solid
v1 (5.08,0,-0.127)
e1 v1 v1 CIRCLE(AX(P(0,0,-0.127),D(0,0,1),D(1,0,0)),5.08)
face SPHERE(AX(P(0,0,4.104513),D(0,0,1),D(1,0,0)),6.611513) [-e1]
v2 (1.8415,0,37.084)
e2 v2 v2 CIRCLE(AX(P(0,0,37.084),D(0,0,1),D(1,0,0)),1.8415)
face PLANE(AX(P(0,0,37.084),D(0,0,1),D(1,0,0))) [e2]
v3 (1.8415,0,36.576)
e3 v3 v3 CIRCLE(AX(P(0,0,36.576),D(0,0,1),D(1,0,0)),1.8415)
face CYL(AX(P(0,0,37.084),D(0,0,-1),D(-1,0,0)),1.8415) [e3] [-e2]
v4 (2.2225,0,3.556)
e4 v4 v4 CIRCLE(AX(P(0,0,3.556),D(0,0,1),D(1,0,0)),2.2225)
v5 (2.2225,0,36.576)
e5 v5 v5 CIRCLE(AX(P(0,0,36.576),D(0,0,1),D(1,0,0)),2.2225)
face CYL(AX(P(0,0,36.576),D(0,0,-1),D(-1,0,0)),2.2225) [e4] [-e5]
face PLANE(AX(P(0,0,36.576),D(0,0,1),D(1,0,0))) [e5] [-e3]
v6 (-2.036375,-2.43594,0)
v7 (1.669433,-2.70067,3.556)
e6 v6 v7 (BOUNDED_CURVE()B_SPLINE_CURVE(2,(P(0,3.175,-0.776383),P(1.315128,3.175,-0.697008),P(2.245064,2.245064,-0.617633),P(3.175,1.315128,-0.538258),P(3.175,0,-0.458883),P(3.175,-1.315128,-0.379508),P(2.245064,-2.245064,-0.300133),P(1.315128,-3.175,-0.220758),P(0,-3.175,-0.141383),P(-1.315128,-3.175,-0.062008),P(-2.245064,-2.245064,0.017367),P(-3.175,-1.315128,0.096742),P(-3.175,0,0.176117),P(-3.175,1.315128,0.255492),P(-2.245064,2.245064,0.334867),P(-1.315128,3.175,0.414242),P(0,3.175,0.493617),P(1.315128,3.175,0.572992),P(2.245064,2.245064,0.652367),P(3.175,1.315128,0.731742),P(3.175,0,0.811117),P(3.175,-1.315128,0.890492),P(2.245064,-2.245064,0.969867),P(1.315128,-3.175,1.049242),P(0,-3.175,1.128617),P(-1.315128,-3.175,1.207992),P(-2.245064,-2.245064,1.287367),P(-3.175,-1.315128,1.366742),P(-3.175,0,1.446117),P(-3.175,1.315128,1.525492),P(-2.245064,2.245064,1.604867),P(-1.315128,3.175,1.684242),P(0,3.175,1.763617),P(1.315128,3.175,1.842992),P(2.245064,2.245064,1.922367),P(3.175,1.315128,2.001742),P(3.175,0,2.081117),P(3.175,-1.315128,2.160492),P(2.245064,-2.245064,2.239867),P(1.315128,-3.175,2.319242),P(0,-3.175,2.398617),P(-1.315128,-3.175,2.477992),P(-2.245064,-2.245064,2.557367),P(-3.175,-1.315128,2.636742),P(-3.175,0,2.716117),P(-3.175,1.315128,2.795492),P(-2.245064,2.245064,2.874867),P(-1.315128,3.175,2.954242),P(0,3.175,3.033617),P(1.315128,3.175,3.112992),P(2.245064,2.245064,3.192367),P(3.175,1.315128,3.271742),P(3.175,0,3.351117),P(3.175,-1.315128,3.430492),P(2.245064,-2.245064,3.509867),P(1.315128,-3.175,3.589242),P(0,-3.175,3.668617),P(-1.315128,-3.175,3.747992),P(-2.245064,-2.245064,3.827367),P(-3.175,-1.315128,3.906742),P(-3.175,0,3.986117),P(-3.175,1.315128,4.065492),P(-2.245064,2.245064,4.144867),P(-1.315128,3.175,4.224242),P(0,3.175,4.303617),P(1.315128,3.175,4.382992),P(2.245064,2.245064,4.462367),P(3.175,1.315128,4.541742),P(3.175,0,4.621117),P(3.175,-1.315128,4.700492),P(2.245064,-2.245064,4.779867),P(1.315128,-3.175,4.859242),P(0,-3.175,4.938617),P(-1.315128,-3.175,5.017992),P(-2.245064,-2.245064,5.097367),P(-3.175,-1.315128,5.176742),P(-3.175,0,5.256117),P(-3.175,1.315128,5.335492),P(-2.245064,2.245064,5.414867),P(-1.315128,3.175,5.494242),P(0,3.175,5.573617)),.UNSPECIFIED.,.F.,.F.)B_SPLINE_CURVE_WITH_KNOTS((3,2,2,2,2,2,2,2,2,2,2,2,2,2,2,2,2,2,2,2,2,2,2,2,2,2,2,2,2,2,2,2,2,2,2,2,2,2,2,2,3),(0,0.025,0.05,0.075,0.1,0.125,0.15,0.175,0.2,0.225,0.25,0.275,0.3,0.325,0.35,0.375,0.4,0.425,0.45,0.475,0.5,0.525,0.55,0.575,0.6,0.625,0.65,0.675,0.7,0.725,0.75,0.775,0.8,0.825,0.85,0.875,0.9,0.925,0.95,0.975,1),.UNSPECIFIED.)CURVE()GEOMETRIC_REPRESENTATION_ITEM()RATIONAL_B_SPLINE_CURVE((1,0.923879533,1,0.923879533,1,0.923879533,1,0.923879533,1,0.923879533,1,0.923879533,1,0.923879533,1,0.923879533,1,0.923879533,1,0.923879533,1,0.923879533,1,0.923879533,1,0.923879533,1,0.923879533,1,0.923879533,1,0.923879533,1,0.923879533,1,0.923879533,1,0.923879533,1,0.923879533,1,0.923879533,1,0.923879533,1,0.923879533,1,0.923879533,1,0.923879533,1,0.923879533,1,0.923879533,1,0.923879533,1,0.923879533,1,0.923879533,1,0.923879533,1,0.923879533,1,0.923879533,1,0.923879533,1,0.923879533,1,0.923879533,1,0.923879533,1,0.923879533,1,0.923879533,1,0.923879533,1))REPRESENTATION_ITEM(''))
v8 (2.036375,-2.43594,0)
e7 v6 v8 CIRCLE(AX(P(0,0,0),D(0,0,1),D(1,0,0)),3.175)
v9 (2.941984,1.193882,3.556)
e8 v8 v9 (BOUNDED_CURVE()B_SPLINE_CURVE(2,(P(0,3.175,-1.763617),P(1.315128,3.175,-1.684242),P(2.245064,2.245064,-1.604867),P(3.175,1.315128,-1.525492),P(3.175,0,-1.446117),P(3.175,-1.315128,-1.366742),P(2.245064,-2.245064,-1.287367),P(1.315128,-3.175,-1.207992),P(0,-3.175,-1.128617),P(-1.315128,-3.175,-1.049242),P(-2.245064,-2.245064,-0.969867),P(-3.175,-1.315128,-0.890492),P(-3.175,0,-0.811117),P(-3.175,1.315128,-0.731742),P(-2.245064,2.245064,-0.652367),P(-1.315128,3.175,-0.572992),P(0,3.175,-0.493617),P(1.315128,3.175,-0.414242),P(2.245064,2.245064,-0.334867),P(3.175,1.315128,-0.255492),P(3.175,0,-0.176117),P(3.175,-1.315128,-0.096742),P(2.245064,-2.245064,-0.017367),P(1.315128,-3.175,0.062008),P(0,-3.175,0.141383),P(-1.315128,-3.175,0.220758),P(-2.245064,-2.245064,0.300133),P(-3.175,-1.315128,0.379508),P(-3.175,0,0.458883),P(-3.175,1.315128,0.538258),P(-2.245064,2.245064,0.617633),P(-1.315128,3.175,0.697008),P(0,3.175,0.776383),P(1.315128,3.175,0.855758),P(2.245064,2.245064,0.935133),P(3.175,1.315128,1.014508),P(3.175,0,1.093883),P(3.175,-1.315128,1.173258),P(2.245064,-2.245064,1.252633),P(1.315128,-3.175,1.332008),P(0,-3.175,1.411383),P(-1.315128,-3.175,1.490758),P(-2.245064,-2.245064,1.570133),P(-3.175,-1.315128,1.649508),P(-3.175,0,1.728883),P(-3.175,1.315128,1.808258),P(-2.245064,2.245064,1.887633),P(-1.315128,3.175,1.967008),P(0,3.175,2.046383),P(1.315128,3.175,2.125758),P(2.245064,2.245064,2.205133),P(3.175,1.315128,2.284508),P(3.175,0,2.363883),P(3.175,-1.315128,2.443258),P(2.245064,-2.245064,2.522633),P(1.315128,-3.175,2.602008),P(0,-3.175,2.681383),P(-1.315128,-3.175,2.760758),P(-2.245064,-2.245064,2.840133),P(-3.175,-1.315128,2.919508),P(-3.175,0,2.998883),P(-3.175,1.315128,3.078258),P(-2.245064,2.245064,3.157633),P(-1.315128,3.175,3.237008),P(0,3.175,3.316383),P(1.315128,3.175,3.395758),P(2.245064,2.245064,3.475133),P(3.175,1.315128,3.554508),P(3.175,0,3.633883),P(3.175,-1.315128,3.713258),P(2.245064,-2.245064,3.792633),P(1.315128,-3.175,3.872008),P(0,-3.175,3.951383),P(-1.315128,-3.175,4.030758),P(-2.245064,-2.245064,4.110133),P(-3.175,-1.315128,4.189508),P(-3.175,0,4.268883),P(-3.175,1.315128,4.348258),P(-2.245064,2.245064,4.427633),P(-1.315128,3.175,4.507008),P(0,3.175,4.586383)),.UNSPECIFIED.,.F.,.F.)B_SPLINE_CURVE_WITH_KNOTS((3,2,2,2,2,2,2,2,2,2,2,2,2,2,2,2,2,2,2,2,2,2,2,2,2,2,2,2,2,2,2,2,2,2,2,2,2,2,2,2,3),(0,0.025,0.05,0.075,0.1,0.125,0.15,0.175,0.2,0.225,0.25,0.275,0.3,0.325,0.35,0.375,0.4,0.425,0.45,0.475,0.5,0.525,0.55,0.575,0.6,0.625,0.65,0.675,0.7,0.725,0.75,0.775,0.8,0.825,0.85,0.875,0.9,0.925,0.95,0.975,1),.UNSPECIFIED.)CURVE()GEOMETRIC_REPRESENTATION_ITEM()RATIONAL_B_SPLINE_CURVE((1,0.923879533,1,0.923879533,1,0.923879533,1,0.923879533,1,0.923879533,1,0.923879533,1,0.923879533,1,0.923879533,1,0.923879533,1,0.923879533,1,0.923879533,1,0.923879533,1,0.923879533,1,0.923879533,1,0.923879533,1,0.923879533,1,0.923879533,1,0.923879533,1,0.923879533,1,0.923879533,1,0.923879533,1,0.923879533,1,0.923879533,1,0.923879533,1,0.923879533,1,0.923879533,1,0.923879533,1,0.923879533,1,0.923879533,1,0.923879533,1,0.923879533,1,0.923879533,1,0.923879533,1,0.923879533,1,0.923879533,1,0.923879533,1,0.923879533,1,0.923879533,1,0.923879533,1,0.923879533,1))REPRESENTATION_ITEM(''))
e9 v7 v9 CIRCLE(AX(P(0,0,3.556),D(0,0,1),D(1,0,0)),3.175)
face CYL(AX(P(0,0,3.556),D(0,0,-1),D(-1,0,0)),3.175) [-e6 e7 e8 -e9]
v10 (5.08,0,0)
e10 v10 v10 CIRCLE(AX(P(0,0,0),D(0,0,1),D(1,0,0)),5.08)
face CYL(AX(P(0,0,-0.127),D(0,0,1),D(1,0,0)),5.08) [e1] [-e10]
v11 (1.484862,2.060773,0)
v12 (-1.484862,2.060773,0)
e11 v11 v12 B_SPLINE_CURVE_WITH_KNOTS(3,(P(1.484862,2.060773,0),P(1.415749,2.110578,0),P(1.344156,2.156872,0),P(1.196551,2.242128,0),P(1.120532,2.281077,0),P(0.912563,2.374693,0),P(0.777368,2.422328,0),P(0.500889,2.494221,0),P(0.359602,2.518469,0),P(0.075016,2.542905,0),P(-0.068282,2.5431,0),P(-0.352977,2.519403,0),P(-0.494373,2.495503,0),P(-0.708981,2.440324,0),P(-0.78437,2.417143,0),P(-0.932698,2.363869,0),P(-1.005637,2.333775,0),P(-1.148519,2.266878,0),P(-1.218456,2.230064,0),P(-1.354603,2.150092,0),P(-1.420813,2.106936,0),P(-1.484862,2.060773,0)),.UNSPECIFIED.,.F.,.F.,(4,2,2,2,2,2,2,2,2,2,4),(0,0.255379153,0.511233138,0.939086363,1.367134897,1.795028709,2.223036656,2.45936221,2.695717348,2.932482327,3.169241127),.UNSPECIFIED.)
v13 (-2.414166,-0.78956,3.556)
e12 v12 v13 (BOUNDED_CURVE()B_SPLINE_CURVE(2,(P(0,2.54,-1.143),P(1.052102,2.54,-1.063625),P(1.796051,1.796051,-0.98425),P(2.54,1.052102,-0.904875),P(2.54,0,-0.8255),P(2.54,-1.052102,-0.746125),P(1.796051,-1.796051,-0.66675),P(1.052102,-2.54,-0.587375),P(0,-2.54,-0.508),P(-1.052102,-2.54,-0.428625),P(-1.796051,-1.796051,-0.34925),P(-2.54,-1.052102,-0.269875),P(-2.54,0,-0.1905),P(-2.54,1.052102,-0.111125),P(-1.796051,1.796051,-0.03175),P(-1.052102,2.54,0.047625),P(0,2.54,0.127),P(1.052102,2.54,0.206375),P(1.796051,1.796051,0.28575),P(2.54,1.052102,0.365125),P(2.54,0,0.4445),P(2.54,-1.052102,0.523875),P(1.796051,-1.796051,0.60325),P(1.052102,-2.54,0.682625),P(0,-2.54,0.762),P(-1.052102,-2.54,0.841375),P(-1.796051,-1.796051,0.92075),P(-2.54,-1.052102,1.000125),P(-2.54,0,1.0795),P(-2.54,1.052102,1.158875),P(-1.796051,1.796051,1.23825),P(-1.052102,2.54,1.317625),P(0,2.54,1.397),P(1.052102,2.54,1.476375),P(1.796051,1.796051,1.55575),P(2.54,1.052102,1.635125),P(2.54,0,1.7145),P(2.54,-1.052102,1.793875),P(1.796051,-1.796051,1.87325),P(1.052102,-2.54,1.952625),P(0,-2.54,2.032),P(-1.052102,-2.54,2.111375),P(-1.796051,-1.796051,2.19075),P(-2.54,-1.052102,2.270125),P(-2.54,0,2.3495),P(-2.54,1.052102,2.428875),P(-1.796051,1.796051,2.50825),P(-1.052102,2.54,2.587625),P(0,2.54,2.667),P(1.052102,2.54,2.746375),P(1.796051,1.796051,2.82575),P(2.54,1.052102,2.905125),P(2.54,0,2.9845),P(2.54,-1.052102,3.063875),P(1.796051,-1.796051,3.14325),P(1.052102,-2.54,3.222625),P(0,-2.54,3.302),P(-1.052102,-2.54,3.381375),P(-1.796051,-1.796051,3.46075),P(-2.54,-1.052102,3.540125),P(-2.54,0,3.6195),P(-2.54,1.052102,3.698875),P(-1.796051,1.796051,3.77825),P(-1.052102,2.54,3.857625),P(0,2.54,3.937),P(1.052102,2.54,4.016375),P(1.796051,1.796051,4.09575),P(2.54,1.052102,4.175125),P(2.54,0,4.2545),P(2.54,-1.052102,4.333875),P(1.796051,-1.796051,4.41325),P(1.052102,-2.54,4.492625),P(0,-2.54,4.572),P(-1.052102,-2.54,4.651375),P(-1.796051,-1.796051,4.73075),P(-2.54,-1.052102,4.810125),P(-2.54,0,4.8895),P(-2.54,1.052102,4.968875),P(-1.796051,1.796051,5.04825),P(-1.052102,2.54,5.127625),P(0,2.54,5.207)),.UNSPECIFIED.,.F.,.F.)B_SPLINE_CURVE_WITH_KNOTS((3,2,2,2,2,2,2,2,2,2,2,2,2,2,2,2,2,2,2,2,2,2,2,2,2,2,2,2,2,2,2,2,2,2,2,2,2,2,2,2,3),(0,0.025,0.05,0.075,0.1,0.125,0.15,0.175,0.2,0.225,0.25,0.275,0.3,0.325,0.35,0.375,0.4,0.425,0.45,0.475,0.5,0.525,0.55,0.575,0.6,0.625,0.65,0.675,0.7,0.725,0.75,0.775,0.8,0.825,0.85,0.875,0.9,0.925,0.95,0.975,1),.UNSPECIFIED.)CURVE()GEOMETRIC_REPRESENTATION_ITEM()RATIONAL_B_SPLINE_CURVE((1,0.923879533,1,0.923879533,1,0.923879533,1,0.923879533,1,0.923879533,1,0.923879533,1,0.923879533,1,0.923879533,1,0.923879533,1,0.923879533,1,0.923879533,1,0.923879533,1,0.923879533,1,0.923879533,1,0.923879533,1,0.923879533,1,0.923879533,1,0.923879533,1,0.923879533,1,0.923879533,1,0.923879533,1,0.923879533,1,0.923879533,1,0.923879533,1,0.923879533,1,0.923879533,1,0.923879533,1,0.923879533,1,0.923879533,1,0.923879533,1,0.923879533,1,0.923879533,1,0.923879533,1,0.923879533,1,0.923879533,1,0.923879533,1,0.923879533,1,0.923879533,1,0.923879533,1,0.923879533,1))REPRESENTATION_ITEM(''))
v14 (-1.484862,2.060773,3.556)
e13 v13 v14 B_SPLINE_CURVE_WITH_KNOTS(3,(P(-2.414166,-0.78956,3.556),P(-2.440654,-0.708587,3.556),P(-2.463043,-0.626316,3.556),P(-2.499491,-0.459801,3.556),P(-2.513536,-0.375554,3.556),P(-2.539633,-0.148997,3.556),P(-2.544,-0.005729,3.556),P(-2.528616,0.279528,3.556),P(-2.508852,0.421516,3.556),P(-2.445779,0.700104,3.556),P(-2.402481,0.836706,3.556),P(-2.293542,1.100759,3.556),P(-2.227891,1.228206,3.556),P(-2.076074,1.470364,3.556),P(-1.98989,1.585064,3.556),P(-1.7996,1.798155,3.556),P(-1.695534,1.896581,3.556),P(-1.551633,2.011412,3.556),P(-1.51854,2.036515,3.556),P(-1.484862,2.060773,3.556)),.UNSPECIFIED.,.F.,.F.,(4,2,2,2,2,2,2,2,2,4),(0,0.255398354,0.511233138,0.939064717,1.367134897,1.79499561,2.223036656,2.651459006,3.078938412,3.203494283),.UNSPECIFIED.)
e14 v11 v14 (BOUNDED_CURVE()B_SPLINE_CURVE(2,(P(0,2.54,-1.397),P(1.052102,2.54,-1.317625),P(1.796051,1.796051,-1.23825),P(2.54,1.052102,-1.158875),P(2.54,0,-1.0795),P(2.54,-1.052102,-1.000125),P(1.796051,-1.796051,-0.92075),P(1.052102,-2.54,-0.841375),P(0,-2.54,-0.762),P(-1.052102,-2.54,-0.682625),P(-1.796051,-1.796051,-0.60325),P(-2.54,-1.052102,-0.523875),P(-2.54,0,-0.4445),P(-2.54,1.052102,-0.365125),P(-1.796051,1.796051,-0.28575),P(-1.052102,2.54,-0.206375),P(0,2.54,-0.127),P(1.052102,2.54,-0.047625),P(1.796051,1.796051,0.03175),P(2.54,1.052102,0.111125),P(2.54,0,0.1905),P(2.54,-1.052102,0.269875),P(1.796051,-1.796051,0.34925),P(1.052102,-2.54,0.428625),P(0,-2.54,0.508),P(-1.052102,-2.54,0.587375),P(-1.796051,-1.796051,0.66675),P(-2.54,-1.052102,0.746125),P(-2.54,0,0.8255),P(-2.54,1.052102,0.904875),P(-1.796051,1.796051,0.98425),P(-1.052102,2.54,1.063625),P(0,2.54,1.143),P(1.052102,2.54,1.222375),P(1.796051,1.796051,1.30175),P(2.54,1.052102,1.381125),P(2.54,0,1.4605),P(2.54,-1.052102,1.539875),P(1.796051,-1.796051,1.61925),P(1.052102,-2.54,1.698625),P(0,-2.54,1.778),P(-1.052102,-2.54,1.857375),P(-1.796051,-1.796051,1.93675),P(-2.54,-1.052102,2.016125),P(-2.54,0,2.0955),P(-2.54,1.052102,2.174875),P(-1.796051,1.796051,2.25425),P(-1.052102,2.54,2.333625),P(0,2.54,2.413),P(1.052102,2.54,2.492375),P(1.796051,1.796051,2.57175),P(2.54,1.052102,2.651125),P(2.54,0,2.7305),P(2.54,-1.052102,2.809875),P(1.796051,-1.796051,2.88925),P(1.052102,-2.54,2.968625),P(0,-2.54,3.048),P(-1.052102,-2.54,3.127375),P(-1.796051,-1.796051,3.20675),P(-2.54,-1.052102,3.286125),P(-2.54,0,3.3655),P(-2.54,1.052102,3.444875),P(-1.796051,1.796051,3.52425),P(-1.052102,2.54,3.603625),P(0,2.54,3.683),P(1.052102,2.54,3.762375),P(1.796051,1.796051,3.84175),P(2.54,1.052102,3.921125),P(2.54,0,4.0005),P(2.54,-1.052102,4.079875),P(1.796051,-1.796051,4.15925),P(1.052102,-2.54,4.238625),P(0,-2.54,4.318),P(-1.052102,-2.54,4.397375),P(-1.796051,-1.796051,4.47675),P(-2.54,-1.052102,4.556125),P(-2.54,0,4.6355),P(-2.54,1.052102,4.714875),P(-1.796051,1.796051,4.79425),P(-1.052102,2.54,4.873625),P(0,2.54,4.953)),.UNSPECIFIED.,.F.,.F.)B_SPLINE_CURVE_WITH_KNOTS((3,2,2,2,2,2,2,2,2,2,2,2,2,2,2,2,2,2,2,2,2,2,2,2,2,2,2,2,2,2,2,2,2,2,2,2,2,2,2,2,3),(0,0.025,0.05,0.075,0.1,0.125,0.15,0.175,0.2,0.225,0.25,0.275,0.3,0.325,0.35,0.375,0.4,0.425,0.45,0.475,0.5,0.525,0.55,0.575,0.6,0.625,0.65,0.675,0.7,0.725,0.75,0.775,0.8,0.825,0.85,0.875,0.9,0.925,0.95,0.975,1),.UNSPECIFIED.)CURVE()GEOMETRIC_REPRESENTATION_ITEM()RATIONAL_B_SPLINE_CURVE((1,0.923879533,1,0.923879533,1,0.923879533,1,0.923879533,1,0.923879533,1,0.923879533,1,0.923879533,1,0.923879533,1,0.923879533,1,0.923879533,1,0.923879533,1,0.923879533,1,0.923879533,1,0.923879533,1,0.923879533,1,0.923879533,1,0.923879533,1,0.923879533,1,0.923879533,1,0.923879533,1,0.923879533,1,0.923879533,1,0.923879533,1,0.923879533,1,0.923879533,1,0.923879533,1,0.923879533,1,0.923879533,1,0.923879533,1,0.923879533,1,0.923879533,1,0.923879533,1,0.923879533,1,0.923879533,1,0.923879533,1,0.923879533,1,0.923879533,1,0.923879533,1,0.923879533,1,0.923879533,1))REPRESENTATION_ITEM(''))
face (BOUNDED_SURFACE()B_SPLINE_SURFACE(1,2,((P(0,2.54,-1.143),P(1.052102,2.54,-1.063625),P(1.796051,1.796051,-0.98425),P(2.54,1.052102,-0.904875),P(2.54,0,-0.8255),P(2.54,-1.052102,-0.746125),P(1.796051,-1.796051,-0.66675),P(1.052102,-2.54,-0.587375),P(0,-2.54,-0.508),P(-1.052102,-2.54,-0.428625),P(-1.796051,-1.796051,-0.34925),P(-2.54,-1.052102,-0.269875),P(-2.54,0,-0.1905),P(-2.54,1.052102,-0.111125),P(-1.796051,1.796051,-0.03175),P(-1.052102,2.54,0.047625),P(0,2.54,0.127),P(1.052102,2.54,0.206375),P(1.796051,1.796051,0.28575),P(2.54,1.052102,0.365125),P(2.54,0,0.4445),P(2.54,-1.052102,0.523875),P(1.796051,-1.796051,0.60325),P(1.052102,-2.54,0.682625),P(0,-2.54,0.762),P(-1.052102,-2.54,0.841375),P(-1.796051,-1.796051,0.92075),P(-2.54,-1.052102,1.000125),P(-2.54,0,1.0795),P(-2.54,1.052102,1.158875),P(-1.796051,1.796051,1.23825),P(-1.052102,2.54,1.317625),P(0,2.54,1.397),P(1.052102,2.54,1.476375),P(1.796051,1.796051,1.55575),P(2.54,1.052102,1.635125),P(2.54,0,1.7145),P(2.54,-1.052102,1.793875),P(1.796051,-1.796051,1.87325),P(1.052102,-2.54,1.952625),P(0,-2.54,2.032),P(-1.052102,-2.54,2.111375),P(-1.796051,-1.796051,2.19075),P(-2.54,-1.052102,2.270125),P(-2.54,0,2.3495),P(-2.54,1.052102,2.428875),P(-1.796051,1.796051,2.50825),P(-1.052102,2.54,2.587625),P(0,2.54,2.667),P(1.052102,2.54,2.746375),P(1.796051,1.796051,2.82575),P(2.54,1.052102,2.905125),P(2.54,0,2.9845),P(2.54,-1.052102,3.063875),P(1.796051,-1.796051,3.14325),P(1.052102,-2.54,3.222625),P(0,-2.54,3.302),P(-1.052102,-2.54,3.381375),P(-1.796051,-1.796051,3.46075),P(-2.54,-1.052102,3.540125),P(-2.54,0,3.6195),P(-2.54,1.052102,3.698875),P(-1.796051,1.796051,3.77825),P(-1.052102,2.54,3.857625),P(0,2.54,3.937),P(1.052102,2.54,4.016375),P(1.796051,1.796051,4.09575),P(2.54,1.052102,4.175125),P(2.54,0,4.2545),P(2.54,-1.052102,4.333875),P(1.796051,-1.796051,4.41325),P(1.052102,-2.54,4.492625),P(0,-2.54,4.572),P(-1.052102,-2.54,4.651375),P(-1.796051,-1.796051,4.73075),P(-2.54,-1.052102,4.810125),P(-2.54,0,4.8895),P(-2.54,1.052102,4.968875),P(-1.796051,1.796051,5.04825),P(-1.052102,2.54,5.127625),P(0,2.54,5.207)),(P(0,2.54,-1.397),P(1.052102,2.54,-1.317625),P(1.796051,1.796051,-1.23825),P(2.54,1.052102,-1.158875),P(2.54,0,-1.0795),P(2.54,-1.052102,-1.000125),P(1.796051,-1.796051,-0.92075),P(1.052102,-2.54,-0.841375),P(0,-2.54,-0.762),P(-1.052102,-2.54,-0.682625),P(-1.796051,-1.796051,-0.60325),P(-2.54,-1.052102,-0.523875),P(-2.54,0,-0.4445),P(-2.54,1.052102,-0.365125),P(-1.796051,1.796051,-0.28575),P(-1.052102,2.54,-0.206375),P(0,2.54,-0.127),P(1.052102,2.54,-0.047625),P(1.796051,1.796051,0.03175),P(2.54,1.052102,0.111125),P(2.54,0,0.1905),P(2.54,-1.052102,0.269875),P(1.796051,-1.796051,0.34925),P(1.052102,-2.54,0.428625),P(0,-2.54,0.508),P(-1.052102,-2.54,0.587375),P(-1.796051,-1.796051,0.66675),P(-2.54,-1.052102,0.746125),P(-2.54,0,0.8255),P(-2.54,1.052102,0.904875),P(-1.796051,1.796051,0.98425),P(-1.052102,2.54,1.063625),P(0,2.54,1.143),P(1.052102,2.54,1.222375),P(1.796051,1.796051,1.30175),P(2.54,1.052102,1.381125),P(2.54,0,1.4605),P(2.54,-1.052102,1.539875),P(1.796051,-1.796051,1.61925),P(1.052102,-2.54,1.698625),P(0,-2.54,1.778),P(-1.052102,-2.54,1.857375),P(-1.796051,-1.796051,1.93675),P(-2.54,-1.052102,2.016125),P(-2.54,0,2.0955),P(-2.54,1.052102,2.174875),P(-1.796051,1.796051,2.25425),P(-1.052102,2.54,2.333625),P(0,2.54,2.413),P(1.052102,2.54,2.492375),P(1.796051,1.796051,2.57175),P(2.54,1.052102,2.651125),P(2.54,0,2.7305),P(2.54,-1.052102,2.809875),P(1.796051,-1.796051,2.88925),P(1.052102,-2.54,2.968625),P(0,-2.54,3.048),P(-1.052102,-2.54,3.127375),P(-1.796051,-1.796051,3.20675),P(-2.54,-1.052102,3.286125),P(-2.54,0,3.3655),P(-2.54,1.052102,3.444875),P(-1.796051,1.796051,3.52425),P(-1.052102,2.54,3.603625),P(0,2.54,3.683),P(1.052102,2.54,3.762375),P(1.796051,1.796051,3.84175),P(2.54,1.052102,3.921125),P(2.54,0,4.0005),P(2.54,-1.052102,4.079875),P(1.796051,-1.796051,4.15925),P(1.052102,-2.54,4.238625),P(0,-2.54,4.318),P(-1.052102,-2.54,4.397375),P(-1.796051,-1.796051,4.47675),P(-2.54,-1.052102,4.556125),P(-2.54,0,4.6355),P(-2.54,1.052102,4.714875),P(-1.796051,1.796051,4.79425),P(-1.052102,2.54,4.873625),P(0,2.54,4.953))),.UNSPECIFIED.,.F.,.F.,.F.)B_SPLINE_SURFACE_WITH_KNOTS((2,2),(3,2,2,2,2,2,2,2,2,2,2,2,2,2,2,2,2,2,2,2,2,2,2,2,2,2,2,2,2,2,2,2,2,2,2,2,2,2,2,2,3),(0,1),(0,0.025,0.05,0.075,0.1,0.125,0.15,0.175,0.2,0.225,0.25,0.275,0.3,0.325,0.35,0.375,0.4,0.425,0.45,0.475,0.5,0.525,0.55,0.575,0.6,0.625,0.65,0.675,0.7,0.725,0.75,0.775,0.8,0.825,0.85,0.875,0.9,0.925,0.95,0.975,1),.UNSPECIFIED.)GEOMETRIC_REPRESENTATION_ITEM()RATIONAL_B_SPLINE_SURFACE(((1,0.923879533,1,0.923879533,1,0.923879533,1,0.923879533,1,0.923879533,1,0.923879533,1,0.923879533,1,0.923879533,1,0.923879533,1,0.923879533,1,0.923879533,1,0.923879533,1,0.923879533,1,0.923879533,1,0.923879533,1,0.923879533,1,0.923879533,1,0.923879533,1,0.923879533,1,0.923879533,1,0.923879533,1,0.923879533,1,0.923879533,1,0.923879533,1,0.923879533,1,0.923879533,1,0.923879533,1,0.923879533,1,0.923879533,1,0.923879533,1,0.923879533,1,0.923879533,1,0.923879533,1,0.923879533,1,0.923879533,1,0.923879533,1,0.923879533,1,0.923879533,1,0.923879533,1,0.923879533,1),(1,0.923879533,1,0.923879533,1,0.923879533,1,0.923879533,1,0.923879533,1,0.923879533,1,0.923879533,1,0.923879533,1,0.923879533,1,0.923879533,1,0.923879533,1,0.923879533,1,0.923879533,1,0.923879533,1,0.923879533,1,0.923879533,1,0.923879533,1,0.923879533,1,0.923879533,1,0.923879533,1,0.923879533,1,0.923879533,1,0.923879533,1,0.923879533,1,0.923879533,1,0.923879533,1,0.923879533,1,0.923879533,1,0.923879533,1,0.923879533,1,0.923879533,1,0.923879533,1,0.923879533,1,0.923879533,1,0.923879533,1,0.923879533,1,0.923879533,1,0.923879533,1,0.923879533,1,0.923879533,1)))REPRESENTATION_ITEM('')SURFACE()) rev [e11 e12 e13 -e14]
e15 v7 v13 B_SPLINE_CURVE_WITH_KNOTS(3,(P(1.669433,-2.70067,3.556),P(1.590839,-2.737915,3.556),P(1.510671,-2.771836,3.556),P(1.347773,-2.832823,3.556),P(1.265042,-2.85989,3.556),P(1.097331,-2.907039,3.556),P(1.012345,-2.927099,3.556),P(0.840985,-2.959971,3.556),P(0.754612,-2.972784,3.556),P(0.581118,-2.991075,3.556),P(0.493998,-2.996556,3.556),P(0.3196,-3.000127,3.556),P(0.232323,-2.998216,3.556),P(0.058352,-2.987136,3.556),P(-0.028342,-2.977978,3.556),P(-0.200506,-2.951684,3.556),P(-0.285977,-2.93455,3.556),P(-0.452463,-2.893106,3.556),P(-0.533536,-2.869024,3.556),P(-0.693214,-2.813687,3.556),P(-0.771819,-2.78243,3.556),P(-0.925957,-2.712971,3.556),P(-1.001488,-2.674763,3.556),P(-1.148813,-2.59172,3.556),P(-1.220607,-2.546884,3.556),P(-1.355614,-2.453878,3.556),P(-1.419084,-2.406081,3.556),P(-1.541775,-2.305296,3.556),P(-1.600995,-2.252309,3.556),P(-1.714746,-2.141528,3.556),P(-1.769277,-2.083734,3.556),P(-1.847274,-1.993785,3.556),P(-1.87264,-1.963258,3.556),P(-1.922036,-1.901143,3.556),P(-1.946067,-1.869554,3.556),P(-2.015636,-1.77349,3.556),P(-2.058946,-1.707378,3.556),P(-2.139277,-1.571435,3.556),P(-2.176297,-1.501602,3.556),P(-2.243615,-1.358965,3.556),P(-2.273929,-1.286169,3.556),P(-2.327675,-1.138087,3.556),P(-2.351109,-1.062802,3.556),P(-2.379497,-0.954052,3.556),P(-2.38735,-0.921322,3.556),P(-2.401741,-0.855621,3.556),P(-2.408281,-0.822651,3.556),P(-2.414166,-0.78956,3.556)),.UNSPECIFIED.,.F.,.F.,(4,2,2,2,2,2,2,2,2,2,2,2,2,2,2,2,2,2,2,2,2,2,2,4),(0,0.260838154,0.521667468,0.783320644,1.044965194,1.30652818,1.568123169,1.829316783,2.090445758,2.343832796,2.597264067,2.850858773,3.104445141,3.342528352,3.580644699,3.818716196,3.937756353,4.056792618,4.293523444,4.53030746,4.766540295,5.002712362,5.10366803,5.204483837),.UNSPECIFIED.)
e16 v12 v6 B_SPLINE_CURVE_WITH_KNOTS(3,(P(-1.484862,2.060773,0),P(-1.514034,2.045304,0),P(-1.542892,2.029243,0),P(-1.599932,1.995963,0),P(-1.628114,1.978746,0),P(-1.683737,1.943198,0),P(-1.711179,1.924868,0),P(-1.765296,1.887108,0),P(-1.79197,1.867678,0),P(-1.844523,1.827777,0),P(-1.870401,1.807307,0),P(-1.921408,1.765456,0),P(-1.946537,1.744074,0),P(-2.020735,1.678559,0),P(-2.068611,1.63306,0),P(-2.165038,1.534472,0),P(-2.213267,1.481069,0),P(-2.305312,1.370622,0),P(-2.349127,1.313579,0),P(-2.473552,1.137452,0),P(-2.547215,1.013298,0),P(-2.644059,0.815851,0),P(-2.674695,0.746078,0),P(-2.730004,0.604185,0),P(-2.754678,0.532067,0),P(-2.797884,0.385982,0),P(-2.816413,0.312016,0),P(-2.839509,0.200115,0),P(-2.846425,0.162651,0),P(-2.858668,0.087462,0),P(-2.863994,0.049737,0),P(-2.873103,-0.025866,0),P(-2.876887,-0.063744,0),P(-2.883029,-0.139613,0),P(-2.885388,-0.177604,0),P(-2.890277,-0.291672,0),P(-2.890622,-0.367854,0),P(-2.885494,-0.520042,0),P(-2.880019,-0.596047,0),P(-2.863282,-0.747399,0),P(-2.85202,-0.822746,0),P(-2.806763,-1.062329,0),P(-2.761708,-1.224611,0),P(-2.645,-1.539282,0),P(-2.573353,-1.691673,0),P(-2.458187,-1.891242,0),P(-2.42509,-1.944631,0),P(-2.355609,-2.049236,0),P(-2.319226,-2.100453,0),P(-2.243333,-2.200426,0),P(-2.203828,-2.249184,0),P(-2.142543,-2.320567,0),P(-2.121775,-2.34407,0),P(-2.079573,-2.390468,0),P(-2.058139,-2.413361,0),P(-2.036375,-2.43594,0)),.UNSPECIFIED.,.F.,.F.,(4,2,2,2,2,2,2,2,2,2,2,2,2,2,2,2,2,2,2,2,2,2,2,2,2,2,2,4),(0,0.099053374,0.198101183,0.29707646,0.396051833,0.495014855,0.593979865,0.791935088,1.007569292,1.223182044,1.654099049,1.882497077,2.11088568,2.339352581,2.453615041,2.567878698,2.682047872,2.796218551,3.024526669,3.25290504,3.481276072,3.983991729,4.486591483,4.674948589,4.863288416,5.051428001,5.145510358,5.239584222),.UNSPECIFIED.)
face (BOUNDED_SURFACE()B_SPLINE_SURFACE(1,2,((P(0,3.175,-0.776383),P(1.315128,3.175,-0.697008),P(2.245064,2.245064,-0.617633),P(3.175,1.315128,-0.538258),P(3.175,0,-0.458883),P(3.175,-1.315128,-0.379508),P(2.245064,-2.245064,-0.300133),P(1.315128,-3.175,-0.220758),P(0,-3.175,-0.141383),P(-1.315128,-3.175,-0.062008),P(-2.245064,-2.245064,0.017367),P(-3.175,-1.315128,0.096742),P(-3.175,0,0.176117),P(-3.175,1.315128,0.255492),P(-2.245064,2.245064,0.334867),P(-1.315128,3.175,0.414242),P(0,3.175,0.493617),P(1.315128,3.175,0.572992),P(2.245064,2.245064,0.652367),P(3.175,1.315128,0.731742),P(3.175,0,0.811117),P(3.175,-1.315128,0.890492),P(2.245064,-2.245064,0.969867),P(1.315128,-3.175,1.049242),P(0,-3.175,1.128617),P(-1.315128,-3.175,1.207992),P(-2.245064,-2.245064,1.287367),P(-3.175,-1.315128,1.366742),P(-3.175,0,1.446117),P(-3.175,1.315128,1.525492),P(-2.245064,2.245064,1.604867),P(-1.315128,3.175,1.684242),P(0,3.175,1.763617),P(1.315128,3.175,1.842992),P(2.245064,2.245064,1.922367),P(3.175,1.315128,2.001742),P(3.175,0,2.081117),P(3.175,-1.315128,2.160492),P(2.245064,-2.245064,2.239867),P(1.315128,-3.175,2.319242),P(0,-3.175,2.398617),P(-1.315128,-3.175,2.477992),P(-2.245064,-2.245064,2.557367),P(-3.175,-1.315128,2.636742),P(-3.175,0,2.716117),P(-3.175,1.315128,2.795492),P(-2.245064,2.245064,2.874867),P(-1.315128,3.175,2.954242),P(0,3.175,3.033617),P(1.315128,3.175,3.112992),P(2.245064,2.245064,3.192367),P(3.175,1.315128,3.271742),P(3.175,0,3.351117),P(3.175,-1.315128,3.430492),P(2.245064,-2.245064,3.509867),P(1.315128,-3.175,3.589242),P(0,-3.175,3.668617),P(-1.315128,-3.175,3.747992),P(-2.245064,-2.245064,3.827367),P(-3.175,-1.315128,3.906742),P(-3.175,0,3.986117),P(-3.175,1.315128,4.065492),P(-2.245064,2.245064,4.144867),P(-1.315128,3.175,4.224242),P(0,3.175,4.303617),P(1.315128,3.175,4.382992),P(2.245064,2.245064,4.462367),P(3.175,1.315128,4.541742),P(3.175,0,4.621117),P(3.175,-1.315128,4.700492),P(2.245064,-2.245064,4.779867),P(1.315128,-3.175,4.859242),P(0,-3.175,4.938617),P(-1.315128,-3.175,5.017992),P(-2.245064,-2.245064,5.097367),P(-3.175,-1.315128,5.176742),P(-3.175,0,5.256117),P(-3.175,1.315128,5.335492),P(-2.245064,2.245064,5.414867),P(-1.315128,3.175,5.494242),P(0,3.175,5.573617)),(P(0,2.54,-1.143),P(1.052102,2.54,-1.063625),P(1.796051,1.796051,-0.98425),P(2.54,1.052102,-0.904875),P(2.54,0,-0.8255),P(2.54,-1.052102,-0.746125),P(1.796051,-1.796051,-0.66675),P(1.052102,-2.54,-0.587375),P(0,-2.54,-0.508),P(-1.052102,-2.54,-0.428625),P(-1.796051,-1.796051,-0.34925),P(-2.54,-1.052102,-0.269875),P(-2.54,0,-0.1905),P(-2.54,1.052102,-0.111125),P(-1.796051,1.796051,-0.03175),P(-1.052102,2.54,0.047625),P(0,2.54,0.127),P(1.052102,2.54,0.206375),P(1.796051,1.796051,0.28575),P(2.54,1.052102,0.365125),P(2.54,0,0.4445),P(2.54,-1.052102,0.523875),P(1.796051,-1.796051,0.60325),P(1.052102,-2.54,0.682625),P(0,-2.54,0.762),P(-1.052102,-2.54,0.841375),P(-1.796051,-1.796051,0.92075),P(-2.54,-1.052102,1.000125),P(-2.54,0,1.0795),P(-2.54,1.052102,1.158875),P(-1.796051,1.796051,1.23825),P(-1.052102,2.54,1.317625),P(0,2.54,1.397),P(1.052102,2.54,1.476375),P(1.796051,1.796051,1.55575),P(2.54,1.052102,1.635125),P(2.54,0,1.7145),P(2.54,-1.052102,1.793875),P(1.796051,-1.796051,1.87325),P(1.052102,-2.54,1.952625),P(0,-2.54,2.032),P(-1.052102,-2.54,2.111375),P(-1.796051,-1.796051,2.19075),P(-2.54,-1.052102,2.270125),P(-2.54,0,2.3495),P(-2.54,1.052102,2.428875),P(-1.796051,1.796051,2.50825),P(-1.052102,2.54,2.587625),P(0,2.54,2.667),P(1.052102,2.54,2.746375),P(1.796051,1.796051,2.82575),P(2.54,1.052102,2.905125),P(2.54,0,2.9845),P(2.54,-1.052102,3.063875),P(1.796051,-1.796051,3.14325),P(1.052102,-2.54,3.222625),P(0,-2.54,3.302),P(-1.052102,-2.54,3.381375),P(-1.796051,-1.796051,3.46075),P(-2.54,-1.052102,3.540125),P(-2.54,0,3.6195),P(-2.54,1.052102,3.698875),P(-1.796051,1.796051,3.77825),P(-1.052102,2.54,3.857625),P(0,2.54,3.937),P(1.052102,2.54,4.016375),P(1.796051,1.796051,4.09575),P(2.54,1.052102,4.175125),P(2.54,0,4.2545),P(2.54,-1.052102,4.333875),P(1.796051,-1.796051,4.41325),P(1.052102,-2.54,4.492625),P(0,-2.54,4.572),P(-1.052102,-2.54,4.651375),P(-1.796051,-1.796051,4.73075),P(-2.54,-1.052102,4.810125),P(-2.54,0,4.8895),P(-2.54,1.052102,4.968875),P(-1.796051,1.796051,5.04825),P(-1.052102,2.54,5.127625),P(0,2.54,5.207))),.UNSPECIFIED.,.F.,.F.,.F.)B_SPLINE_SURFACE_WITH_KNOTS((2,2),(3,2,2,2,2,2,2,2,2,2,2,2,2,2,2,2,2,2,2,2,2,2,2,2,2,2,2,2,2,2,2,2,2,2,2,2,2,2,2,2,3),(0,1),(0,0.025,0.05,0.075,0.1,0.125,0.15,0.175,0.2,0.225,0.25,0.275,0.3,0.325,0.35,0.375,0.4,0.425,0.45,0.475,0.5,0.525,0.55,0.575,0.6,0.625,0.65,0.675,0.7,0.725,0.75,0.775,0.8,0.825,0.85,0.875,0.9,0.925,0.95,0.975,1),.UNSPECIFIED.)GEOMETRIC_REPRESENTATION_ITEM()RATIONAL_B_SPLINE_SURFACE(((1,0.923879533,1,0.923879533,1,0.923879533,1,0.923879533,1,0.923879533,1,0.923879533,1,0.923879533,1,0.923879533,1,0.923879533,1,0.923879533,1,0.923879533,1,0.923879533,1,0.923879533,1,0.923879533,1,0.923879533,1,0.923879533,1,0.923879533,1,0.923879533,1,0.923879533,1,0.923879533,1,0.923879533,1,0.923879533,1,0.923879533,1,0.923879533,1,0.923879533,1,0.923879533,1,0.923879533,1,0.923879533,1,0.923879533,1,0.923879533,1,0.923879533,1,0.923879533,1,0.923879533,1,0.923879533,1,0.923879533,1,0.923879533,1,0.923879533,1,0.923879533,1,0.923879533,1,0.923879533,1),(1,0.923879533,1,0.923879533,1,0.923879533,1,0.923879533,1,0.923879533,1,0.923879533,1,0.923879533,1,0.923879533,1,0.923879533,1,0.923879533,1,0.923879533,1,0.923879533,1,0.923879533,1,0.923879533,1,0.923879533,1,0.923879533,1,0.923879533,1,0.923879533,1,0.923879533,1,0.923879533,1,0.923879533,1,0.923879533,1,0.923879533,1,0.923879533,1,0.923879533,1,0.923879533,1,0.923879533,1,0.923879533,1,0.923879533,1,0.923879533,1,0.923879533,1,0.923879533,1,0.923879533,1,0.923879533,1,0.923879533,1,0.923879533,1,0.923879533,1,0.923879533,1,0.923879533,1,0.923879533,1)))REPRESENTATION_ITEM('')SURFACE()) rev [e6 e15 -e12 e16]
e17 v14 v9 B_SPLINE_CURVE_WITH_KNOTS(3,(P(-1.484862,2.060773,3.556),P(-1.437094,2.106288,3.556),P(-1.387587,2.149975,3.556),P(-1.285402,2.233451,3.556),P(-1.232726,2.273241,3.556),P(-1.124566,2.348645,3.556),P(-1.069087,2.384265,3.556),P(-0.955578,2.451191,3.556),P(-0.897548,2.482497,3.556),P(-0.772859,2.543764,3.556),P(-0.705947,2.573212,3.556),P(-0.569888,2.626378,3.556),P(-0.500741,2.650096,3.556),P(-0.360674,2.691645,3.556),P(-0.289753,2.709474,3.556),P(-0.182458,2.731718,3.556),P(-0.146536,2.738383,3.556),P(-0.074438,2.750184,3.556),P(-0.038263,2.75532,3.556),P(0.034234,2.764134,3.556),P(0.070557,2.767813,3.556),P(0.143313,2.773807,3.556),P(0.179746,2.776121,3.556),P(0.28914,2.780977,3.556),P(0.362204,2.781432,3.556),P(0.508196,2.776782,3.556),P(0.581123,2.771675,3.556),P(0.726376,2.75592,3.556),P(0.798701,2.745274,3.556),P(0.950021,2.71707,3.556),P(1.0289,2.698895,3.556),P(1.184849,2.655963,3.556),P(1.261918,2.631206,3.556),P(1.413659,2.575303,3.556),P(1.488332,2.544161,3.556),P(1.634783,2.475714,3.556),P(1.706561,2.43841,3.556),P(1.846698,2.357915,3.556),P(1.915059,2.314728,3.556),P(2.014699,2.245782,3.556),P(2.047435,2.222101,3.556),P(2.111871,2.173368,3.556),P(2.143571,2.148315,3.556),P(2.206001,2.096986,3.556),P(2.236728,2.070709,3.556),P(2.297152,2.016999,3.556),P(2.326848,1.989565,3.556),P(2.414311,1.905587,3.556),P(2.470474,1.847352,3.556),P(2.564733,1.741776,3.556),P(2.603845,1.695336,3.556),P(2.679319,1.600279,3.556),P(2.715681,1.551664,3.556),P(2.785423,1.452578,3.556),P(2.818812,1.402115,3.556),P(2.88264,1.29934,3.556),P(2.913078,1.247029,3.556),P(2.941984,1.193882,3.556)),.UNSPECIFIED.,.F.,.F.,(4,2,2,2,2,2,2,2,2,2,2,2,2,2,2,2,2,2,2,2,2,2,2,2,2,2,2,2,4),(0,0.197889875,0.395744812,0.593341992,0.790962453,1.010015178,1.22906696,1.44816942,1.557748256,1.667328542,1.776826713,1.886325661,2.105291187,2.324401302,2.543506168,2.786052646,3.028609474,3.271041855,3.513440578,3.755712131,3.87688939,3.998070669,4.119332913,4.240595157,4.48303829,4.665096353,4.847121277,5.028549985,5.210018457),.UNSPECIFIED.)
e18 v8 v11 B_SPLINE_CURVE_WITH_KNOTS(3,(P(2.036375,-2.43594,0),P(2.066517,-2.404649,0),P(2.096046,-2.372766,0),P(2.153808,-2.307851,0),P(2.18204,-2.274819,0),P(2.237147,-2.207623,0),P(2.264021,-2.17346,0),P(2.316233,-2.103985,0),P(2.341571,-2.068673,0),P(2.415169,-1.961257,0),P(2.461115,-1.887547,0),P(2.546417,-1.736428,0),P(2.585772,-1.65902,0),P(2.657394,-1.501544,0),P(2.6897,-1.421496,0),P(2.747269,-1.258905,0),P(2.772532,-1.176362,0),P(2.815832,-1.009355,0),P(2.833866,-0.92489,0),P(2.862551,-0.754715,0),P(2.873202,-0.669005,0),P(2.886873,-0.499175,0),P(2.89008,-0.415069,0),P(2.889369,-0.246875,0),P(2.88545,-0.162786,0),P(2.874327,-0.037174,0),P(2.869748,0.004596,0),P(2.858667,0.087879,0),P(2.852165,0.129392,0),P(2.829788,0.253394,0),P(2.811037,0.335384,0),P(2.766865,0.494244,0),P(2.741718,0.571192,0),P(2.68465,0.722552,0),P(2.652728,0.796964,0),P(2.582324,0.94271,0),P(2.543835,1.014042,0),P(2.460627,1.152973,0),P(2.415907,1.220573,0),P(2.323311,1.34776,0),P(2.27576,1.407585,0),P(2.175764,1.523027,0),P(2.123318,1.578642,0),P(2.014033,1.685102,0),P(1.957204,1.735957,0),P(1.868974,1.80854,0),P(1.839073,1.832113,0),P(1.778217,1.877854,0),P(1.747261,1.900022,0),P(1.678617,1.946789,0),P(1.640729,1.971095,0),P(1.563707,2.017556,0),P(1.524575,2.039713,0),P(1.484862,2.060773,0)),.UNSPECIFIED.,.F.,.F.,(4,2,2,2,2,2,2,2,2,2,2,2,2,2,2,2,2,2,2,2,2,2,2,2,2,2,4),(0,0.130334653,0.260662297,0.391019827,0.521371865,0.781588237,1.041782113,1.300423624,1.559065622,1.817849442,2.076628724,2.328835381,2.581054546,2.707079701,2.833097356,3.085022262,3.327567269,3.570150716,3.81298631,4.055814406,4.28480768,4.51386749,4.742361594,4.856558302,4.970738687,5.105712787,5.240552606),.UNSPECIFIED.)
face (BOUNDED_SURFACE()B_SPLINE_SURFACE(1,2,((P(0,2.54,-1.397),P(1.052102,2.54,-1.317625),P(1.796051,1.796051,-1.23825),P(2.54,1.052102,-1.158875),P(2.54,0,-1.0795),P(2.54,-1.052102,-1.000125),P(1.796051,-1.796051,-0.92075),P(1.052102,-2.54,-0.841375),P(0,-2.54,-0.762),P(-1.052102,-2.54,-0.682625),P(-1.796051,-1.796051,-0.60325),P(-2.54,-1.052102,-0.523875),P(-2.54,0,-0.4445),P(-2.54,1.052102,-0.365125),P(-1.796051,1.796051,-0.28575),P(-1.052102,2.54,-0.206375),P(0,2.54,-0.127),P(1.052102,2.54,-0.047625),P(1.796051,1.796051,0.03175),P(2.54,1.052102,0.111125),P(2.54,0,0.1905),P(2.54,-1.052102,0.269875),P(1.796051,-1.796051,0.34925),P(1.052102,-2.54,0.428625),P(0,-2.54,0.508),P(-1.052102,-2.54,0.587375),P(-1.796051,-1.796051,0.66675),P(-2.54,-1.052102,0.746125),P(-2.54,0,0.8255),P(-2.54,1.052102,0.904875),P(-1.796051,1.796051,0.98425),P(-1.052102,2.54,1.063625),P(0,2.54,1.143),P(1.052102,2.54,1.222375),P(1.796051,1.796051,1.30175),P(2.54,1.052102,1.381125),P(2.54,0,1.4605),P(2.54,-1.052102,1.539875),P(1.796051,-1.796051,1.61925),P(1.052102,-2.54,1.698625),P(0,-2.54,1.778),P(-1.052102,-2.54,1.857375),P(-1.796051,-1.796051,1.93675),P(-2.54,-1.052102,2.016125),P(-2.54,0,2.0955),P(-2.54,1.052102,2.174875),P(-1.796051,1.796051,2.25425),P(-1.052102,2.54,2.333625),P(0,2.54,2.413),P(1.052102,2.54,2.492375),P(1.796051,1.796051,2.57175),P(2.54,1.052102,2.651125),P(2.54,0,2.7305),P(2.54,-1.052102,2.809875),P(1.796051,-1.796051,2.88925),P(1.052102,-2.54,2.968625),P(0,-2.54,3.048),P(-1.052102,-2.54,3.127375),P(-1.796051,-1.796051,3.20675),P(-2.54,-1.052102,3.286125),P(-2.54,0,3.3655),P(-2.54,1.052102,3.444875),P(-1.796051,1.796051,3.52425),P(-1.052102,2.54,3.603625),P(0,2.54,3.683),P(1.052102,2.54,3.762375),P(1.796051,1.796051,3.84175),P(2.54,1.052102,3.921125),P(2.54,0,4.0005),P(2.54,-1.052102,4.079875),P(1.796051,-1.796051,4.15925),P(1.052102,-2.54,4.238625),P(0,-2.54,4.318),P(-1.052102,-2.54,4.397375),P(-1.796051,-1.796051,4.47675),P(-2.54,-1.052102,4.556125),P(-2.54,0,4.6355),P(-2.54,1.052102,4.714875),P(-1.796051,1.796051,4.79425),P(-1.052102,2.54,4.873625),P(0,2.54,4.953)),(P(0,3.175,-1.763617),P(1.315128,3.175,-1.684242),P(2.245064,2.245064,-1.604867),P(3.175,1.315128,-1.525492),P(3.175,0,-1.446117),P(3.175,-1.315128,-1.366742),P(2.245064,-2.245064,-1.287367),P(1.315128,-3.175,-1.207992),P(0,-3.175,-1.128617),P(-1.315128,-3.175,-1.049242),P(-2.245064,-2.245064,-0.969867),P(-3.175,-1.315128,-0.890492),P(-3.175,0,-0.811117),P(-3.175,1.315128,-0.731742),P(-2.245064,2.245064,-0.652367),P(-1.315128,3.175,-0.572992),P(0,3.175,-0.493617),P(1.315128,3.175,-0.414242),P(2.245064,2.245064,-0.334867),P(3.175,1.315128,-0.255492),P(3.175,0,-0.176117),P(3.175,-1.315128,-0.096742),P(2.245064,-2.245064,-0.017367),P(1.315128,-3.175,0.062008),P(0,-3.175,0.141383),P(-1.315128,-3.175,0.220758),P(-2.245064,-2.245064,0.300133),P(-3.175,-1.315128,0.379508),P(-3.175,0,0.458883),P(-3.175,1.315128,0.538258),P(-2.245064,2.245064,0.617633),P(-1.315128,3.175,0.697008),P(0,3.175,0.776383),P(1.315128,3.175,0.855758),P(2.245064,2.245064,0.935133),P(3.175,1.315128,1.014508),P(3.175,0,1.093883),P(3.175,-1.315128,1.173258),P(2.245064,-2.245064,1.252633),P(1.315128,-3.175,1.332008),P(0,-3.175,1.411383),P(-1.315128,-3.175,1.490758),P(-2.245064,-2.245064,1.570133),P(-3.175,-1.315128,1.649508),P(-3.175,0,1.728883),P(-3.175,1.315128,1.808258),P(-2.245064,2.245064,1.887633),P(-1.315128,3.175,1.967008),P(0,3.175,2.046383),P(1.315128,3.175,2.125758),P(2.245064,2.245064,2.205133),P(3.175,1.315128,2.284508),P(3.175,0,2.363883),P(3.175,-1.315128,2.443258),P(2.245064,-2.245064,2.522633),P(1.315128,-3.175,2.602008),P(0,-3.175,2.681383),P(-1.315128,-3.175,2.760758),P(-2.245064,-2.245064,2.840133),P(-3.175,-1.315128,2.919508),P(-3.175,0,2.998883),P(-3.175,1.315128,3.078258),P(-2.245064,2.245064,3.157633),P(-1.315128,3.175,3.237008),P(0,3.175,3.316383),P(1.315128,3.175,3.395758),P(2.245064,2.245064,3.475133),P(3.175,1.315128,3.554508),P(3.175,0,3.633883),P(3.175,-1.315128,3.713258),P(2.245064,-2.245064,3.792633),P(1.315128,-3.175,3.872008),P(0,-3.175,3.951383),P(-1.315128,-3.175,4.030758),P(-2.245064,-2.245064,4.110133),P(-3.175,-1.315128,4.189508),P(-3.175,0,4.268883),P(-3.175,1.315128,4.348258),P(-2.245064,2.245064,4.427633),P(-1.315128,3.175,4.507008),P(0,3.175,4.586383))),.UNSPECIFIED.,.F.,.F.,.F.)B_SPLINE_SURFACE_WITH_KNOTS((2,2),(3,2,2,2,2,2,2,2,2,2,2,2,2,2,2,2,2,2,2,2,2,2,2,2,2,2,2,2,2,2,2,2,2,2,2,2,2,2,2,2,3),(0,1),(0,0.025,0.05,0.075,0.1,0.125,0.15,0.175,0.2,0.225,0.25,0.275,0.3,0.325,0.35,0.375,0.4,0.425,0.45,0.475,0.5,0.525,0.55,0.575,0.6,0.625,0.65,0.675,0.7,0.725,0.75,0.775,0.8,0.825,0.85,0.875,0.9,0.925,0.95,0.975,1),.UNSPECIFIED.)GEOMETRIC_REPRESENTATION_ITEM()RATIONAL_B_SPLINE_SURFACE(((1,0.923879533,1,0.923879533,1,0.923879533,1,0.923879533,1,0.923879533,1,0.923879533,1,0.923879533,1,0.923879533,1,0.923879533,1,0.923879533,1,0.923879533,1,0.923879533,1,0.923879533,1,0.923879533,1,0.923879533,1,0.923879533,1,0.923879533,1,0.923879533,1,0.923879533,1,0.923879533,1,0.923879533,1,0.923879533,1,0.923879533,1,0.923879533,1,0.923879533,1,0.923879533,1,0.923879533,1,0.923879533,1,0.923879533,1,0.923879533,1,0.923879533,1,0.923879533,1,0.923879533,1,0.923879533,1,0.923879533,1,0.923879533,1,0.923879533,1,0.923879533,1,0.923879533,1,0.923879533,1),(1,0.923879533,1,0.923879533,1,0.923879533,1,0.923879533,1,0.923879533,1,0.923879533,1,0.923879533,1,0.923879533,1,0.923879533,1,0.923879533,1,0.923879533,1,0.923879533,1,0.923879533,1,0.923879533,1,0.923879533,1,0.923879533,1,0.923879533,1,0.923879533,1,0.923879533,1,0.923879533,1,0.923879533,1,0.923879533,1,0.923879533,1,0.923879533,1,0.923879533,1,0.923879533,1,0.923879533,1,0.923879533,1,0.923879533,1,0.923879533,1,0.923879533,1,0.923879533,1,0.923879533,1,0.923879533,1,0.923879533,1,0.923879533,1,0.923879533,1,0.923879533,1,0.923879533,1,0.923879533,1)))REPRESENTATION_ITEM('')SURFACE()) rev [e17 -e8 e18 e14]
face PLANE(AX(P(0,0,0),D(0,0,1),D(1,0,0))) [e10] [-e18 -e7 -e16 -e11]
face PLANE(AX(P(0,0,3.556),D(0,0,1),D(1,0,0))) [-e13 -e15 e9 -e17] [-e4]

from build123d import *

# Parameters (mm, degrees)
SKETCH3_R           = 3.175
BOSS_EXTRUDE1_DEPTH = 3.556
CUT_SWEEP1_PITCH    = 1.27
SKETCH10_R          = 2.2225
BOSS_EXTRUDE5_DEPTH = 33.02
SKETCH9_R           = 5.08
BOSS_EXTRUDE4_DEPTH = 0.127
DOME3_FACE_RADIUS   = 5.08
DOME3_HEIGHT        = 2.38
SKETCH11_R          = 1.8415
BOSS_EXTRUDE6_DEPTH = 0.508


with BuildPart() as part:
    # Sketch3 → Boss-Extrude1 (new body)
    with BuildSketch(Plane.XY):
        Circle(SKETCH3_R)
    extrude(amount=BOSS_EXTRUDE1_DEPTH)

    # Cut-Sweep1: arcs per turn and ends read off the stored shape
    # Cut-Sweep1: the profile of Sketch5 profile screwed along a left-hand helix through 5 turns, 8 arcs to a turn; built about Z, then put on its axis
    cut_sweep1_z = Axis((0, 0, 0), (0, 0, 1))
    cut_sweep1_corners = [(2.54, 0, -1.397), (3.1753, 0, -1.763790626), (3.1753, 0, -0.776209374), (2.54, 0, -1.143)]
    with BuildLine(mode=Mode.PRIVATE) as cut_sweep1_profile:
        Line(cut_sweep1_corners[0], cut_sweep1_corners[1])
        Line(cut_sweep1_corners[1], cut_sweep1_corners[2])
        Line(cut_sweep1_corners[2], cut_sweep1_corners[3])
        Line(cut_sweep1_corners[3], cut_sweep1_corners[0])
    cut_sweep1_cap = Face(cut_sweep1_profile.wire())
    cut_sweep1_turn_angles = [0, -22.5, -45, -67.5, -90, -112.5, -135, -157.5, -180, -202.5, -225, -247.5, -270, -292.5, -315, -337.5, -360]
    cut_sweep1_turn_weights = [1, 0.9238795325112867, 1, 0.9238795325112867, 1, 0.9238795325112867, 1, 0.9238795325112867, 1, 0.9238795325112867, 1, 0.9238795325112867, 1, 0.9238795325112867, 1, 0.9238795325112867, 1]
    cut_sweep1_turn_rails = [Edge.make_bspline([Vector(p[0], p[1], 0).rotate(cut_sweep1_z, cut_sweep1_turn_angles[k]) / cut_sweep1_turn_weights[k] + Vector(0, 0, p[2] + -CUT_SWEEP1_PITCH * cut_sweep1_turn_angles[k] / 360) for k in range(17)], [0, 0, 0, 1, 1, 2, 2, 3, 3, 4, 4, 5, 5, 6, 6, 7, 7, 8, 8, 8], 2, cut_sweep1_turn_weights) for p in cut_sweep1_corners]
    cut_sweep1_turn_sides = [Face.make_surface_from_curves(cut_sweep1_turn_rails[p[0]], cut_sweep1_turn_rails[p[1]]) for p in [(0, 1), (1, 2), (2, 3), (3, 0)]]
    cut_sweep1 = Plane(origin=(0, 0, 0), x_dir=(0, 1, 0), z_dir=(0, 0, 1)) * Solid(Shell([*[p.moved(Location((0, 0, CUT_SWEEP1_PITCH * i))) for i in range(5) for p in cut_sweep1_turn_sides], cut_sweep1_cap, cut_sweep1_cap.rotate(cut_sweep1_z, -1800).moved(Location((0, 0, -CUT_SWEEP1_PITCH * -1800 / 360)))]))
    add(cut_sweep1, mode=Mode.SUBTRACT)

    # Sketch10 → Boss-Extrude5 (add)
    with BuildSketch(Plane.XY.offset(3.556)):
        Circle(SKETCH10_R)
    extrude(amount=BOSS_EXTRUDE5_DEPTH)

    # Sketch9 → Boss-Extrude4 (add)
    with BuildSketch(Plane.XY):
        Circle(SKETCH9_R)
    extrude(amount=-BOSS_EXTRUDE4_DEPTH)

    # Dome3: a dome of height H over a round flat face of radius A is a cap of a sphere of radius (A * A + H * H) / (2 * H)
    dome3_r = (DOME3_FACE_RADIUS * DOME3_FACE_RADIUS + DOME3_HEIGHT * DOME3_HEIGHT) / (2 * DOME3_HEIGHT)
    dome3_base = Plane((0, 0, -0.127), z_dir=(0, 0, -1))
    with Locations(dome3_base.offset(DOME3_HEIGHT - dome3_r)):
        dome3_ball = Sphere(dome3_r, mode=Mode.PRIVATE)
    add(split(dome3_ball, bisect_by=dome3_base, keep=Keep.TOP, mode=Mode.PRIVATE))

    # Sketch11 → Boss-Extrude6 (add)
    with BuildSketch(Plane.XY.offset(36.576)):
        Circle(SKETCH11_R)
    extrude(amount=BOSS_EXTRUDE6_DEPTH)


solid = part.part
